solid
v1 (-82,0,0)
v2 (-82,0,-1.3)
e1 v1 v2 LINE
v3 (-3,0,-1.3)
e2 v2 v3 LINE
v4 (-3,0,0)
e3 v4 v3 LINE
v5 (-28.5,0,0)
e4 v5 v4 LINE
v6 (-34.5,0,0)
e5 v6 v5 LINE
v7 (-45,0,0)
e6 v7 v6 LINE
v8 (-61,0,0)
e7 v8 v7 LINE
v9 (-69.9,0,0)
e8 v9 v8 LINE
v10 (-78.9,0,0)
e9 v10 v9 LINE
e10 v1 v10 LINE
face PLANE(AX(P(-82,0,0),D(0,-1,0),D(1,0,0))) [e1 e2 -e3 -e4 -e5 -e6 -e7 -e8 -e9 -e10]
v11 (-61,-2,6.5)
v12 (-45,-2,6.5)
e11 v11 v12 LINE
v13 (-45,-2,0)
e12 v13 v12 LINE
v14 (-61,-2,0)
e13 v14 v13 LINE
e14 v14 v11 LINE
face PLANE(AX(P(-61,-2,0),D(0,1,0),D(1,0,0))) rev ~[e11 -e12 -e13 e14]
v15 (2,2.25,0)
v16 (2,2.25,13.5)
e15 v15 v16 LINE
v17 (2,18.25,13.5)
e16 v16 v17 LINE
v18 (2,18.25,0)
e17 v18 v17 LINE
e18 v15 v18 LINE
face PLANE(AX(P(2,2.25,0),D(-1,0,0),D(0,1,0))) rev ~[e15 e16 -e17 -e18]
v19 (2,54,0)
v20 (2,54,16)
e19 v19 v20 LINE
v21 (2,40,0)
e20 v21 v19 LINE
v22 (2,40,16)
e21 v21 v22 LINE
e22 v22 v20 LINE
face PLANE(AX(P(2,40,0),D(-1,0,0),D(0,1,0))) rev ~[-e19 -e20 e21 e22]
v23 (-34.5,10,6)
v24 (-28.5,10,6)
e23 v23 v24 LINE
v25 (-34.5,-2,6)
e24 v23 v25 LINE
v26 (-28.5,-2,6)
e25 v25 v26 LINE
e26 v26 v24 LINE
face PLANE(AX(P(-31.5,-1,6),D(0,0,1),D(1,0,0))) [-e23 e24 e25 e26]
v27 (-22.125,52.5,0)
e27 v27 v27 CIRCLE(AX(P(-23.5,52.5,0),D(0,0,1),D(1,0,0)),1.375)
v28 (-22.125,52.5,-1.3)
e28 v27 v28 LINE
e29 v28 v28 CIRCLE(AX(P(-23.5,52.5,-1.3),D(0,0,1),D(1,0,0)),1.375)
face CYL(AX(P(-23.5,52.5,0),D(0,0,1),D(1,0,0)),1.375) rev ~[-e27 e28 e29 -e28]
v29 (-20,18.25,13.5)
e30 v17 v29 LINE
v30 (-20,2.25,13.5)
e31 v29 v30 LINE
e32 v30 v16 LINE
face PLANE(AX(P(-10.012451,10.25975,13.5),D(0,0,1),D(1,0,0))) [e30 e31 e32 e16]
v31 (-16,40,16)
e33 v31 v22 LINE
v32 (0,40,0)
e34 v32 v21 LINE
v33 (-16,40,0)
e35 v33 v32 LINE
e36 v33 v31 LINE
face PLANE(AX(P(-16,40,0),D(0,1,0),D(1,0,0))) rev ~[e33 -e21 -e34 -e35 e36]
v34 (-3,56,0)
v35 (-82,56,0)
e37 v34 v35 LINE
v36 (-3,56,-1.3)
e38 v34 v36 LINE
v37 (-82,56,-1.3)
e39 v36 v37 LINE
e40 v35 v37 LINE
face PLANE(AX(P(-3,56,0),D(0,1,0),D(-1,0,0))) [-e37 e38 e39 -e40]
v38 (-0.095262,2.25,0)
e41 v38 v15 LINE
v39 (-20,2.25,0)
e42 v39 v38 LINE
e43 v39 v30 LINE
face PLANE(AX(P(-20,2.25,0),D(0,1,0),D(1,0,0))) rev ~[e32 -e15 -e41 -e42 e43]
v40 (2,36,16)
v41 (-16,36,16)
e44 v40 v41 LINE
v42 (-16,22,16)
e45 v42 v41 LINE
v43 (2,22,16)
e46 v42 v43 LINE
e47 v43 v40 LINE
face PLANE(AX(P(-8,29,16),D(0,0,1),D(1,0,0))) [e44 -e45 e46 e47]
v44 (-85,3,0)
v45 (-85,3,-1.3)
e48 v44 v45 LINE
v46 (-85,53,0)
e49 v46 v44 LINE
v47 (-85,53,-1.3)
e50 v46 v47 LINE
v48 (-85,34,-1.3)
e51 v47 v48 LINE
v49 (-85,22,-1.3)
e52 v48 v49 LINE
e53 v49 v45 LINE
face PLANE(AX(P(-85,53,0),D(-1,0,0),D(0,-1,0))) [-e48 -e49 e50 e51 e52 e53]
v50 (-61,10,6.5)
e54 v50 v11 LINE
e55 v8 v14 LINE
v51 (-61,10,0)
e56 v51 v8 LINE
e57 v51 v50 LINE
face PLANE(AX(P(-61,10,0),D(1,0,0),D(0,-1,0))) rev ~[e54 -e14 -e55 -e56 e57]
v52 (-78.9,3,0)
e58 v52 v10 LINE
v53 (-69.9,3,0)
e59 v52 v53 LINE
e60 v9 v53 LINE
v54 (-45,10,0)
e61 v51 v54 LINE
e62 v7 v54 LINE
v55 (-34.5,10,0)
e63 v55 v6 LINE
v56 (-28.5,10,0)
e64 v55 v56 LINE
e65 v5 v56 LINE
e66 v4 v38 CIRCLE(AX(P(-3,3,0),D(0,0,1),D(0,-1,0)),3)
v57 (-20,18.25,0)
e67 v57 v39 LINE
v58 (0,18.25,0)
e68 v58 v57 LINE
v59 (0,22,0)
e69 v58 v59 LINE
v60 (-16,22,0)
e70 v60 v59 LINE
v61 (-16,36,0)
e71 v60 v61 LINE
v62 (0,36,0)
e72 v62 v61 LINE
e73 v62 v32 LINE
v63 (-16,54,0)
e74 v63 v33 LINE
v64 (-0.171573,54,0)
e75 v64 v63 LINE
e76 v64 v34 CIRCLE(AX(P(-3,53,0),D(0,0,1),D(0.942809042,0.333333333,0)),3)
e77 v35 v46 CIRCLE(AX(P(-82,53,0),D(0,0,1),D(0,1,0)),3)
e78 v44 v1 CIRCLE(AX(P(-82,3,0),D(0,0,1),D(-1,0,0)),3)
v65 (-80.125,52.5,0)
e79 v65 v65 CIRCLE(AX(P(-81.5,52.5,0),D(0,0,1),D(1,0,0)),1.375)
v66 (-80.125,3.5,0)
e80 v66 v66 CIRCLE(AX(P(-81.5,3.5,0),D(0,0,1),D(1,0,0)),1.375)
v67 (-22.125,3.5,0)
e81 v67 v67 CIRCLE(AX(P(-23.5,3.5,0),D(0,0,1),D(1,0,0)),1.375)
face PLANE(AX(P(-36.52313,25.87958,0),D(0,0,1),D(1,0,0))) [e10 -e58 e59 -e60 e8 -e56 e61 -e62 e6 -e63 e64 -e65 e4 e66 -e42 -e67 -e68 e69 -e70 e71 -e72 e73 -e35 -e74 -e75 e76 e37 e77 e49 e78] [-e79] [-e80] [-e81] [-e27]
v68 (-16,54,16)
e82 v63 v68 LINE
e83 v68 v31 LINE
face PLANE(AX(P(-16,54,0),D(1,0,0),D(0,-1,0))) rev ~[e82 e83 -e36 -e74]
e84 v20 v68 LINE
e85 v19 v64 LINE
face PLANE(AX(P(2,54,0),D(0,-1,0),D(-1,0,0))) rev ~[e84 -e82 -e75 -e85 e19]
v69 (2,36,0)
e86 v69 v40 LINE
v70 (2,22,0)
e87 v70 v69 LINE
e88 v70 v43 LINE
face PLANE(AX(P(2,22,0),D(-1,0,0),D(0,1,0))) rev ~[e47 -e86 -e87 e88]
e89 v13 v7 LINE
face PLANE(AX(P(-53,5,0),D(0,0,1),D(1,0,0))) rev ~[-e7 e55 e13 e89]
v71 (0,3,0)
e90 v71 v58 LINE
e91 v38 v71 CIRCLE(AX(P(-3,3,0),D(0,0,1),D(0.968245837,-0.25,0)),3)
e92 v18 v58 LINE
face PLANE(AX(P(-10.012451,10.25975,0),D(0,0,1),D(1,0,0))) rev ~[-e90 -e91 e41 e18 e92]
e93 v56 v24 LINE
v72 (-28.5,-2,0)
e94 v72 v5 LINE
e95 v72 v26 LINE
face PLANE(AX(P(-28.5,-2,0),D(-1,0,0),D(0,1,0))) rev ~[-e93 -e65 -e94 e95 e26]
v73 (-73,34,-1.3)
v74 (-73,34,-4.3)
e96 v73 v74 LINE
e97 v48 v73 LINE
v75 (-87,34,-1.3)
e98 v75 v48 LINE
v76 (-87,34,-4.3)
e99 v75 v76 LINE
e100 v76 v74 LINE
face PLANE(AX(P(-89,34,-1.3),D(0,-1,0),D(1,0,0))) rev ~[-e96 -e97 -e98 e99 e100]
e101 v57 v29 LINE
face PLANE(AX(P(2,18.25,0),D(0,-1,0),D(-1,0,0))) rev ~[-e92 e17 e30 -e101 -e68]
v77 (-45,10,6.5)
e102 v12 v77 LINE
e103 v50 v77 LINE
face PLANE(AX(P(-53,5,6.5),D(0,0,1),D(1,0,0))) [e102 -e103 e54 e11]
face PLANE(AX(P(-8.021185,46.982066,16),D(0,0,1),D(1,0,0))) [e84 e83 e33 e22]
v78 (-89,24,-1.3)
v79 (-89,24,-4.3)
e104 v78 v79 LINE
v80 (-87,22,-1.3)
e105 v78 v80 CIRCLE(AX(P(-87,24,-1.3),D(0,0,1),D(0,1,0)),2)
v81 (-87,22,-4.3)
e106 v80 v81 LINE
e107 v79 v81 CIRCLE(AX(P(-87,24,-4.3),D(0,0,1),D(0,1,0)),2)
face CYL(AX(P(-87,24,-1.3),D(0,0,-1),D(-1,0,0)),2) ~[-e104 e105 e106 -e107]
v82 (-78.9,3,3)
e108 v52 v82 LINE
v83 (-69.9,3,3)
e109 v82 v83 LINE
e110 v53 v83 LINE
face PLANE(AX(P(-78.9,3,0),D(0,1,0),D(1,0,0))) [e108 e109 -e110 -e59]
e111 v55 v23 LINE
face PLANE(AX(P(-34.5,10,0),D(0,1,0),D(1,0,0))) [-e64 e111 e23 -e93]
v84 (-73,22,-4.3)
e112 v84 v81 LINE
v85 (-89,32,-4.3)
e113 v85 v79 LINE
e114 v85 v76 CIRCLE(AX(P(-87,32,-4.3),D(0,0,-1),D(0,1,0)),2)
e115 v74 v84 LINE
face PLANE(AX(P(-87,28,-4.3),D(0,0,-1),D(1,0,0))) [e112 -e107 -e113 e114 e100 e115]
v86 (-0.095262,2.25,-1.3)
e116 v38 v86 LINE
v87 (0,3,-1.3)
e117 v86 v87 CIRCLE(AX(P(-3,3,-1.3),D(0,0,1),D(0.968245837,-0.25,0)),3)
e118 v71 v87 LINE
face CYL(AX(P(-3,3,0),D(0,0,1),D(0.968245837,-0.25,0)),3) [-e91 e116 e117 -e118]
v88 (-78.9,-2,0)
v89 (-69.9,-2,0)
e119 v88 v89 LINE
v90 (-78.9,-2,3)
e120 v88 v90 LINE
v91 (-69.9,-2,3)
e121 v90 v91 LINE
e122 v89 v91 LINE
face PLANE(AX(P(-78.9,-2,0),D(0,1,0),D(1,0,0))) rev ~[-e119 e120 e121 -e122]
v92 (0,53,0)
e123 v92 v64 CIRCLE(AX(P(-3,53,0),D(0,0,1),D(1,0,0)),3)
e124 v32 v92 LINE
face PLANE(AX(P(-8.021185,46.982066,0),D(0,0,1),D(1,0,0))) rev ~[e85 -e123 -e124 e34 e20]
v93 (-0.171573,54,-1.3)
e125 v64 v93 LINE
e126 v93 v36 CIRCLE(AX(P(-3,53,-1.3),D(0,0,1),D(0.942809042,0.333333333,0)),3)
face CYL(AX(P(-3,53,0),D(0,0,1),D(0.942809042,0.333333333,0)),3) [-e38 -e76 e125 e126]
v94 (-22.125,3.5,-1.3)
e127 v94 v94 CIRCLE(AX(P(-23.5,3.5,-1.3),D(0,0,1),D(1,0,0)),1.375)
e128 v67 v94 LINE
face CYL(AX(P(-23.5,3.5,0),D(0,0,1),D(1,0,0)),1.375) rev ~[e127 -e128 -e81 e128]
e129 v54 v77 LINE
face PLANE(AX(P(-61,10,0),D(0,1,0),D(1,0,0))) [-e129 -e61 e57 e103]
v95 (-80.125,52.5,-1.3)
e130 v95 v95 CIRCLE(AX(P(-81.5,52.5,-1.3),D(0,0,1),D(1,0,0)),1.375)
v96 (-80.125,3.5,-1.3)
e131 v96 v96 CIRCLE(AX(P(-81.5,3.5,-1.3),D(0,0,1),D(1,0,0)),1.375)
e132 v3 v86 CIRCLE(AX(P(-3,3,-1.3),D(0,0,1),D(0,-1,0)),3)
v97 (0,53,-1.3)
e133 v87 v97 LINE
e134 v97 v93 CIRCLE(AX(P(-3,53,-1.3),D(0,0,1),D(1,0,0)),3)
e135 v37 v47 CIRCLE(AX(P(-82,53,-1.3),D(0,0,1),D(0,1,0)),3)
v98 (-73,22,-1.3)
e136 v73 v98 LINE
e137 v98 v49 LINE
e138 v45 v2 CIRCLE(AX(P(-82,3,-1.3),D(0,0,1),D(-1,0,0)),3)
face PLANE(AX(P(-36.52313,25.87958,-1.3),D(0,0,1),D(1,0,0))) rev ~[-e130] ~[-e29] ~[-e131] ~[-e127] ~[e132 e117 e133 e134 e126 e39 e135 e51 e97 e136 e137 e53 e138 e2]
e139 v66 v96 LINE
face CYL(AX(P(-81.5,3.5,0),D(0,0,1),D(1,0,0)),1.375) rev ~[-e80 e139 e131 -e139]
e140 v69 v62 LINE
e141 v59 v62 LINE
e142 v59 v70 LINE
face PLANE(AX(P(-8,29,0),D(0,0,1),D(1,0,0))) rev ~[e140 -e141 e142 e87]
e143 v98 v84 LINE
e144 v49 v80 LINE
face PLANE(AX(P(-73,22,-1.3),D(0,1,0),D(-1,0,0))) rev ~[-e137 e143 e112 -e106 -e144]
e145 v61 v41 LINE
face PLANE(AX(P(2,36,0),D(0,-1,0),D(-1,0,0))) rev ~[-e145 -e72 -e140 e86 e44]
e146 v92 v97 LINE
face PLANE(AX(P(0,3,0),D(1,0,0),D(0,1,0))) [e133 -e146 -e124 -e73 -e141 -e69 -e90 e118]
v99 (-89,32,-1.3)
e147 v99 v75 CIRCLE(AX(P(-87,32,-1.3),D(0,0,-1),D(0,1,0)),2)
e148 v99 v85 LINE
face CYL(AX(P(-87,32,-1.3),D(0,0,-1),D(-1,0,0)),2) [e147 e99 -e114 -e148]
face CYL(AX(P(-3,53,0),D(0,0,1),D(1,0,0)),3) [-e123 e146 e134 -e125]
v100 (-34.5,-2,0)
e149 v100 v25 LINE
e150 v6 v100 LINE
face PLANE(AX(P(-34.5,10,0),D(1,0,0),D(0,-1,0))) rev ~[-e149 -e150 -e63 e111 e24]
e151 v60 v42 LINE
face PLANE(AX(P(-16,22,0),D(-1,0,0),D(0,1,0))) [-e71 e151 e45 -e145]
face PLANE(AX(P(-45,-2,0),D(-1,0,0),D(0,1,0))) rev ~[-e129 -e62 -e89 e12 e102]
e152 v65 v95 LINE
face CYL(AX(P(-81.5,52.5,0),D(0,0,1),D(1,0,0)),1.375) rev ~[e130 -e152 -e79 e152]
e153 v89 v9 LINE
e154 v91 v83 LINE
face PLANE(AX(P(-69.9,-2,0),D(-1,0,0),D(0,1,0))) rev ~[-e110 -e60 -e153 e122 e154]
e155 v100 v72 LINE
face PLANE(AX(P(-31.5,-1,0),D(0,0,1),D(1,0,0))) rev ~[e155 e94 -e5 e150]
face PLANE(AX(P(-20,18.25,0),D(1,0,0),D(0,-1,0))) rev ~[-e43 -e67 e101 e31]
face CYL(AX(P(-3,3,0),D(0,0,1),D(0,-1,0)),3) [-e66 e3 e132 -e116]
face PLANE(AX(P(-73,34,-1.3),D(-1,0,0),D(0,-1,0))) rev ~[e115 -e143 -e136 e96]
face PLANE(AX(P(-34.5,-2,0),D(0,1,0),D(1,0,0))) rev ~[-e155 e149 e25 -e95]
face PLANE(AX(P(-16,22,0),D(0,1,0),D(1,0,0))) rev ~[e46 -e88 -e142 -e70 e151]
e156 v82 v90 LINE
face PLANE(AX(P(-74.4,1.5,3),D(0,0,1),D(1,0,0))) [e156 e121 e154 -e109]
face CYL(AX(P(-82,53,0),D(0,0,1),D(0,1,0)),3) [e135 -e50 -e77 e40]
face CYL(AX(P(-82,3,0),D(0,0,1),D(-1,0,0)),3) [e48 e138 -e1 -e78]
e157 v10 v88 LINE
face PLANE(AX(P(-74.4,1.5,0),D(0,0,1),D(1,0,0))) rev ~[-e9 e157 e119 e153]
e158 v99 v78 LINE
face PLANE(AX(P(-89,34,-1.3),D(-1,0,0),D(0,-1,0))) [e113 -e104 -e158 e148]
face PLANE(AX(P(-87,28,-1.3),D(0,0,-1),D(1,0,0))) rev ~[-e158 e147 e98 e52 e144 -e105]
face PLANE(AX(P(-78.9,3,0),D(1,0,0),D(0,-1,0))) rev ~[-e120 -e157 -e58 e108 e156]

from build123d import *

# Parameters (mm, degrees)
F0_R     = 1.375
F0_W     = 9
F0_H     = 3
F0_W_2   = 16
F0_H_2   = 10
F0_W_3   = 6
F0_H_3   = 14
F1_DEPTH = 1.3
F0_W_4   = 2
F2_DEPTH = 16
F3_DEPTH = 13.5
F0_H_4   = 2
F4_DEPTH = 6
F5_DEPTH = 6.5
F6_DEPTH = 3
F7_W     = 4
F7_H     = 12
F7_W_2   = 12
F8_DEPTH = 3
F9_R     = 2


# Not quite as in the source:
# - a feature names something its author has since deleted; it is built from what else it names


with BuildPart() as f1:
    # F0 (on Top) → F1 (new body)
    with BuildSketch(Plane.XY):
        with BuildLine():
            Line((-28.5, 0), (-3, 0))
            ThreePointArc((-3, 0), (-1.1628826929, 0.6282917549), (-0.0952624903, 2.25))
            Line((-0.0952624903, 2.25), (-20, 2.25))
            Line((-20, 2.25), (-20, 18.25))
            Line((-20, 18.25), (0, 18.25))
            Line((0, 18.25), (0, 22))
            Line((0, 22), (-16, 22))
            Line((-16, 22), (-16, 36))
            Line((-16, 36), (0, 36))
            Line((0, 36), (0, 40))
            Line((0, 40), (-16, 40))
            Line((-16, 40), (-16, 54))
            Line((-16, 54), (-0.1715728753, 54))
            ThreePointArc((-0.1715728753, 54), (-1.2679491924, 55.4494897428), (-3, 56))
            Line((-3, 56), (-82, 56))
            ThreePointArc((-82, 56), (-84.1213203436, 55.1213203436), (-85, 53))
            Line((-85, 53), (-85, 3))
            ThreePointArc((-85, 3), (-84.1213203436, 0.8786796564), (-82, 0))
            Line((-82, 0), (-78.9, 0))
            Line((-78.9, 0), (-78.9, 3))
            Line((-78.9, 3), (-69.9, 3))
            Line((-69.9, 3), (-69.9, 0))
            Line((-69.9, 0), (-61, 0))
            Line((-61, 0), (-61, 10))
            Line((-61, 10), (-45, 10))
            Line((-45, 10), (-45, 0))
            Line((-45, 0), (-34.5, 0))
            Line((-34.5, 0), (-34.5, 10))
            Line((-34.5, 10), (-28.5, 10))
            Line((-28.5, 10), (-28.5, 0))
        make_face()
        with Locations((-81.5, 3.5)):
            Circle(F0_R, mode=Mode.SUBTRACT)
        with Locations((-23.5, 3.5)):
            Circle(F0_R, mode=Mode.SUBTRACT)
        with Locations((-81.5, 52.5)):
            Circle(F0_R, mode=Mode.SUBTRACT)
        with Locations((-23.5, 52.5)):
            Circle(F0_R, mode=Mode.SUBTRACT)
        with Locations((-74.4, 1.5)):
            Rectangle(F0_W, F0_H)
        with Locations((-53, 5)):
            Rectangle(F0_W_2, F0_H_2)
        with Locations((-31.5, 5)):
            Rectangle(F0_W_3, F0_H_2)
        with BuildLine():
            Line((-20, 2.25), (-0.0952624903, 2.25))
            ThreePointArc((-0.0952624903, 2.25), (-0.0239109112, 2.6219871226), (0, 3))
            Line((0, 3), (0, 18.25))
            Line((0, 18.25), (-20, 18.25))
            Line((-20, 18.25), (-20, 2.25))
        make_face()
        with Locations((-8, 29)):
            Rectangle(F0_W_2, F0_H_3)
        with BuildLine():
            Line((-16, 40), (0, 40))
            Line((0, 40), (0, 53))
            ThreePointArc((0, 53), (-0.043204321, 53.5073059362), (-0.1715728753, 54))
            Line((-0.1715728753, 54), (-16, 54))
            Line((-16, 54), (-16, 40))
        make_face()
    extrude(amount=-F1_DEPTH)

    # F0 (on Top) → F2 (join)
    with BuildSketch(Plane.XY):
        with BuildLine():
            Line((-16, 40), (0, 40))
            Line((0, 40), (0, 53))
            ThreePointArc((0, 53), (-0.043204321, 53.5073059362), (-0.1715728753, 54))
            Line((-0.1715728753, 54), (-16, 54))
            Line((-16, 54), (-16, 40))
        make_face()
        with Locations((-8, 29)):
            Rectangle(F0_W_2, F0_H_3)
        with Locations((1, 29)):
            Rectangle(F0_W_4, F0_H_3)
        with BuildLine():
            Line((0, 53), (0, 40))
            Line((0, 40), (2, 40))
            Line((2, 40), (2, 54))
            Line((2, 54), (-0.1715728753, 54))
            ThreePointArc((-0.1715728753, 54), (-0.043204321, 53.5073059362), (0, 53))
        make_face()
    extrude(amount=F2_DEPTH)

    # F0 (on Top) → F3 (join)
    with BuildSketch(Plane.XY):
        with BuildLine():
            Line((-20, 2.25), (-0.0952624903, 2.25))
            ThreePointArc((-0.0952624903, 2.25), (-0.0239109112, 2.6219871226), (0, 3))
            Line((0, 3), (0, 18.25))
            Line((0, 18.25), (-20, 18.25))
            Line((-20, 18.25), (-20, 2.25))
        make_face()
        with BuildLine():
            ThreePointArc((0, 3), (-0.0239109112, 2.6219871226), (-0.0952624903, 2.25))
            Line((-0.0952624903, 2.25), (2, 2.25))
            Line((2, 2.25), (2, 18.25))
            Line((2, 18.25), (0, 18.25))
            Line((0, 18.25), (0, 3))
        make_face()
    extrude(amount=F3_DEPTH)

    # F0 (on Top) → F4 (join)
    with BuildSketch(Plane.XY):
        with Locations((-31.5, -1)):
            Rectangle(F0_W_3, F0_H_4)
        with Locations((-31.5, 5)):
            Rectangle(F0_W_3, F0_H_2)
    extrude(amount=F4_DEPTH)

    # F0 (on Top) → F5 (join)
    with BuildSketch(Plane.XY):
        with Locations((-53, 5)):
            Rectangle(F0_W_2, F0_H_2)
        with Locations((-53, -1)):
            Rectangle(F0_W_2, F0_H_4)
    extrude(amount=F5_DEPTH)

    # F0 (on Top) → F6 (join)
    with BuildSketch(Plane.XY):
        with Locations((-74.4, 1.5)):
            Rectangle(F0_W, F0_H)
        with Locations((-74.4, -1)):
            Rectangle(F0_W, F0_H_4)
    extrude(amount=F6_DEPTH)

    # F7 (on face) → F8 (join)
    with BuildSketch(Plane(origin=(0, 0, -1.3), x_dir=(1, 0, 0), z_dir=(0, 0, -1))):
        with Locations((-87, -28)):
            Rectangle(F7_W, F7_H)
        with Locations((-79, -28)):
            Rectangle(F7_W_2, F7_H)
    extrude(amount=F8_DEPTH)

    # F9
    f9_edges = [f1.edges().sort_by_distance(p)[0] for p in [
        (-89, 22, -2.8),
        (-89, 34, -2.8),
    ]]
    fillet(f9_edges, radius=F9_R)


solid = f1.part
